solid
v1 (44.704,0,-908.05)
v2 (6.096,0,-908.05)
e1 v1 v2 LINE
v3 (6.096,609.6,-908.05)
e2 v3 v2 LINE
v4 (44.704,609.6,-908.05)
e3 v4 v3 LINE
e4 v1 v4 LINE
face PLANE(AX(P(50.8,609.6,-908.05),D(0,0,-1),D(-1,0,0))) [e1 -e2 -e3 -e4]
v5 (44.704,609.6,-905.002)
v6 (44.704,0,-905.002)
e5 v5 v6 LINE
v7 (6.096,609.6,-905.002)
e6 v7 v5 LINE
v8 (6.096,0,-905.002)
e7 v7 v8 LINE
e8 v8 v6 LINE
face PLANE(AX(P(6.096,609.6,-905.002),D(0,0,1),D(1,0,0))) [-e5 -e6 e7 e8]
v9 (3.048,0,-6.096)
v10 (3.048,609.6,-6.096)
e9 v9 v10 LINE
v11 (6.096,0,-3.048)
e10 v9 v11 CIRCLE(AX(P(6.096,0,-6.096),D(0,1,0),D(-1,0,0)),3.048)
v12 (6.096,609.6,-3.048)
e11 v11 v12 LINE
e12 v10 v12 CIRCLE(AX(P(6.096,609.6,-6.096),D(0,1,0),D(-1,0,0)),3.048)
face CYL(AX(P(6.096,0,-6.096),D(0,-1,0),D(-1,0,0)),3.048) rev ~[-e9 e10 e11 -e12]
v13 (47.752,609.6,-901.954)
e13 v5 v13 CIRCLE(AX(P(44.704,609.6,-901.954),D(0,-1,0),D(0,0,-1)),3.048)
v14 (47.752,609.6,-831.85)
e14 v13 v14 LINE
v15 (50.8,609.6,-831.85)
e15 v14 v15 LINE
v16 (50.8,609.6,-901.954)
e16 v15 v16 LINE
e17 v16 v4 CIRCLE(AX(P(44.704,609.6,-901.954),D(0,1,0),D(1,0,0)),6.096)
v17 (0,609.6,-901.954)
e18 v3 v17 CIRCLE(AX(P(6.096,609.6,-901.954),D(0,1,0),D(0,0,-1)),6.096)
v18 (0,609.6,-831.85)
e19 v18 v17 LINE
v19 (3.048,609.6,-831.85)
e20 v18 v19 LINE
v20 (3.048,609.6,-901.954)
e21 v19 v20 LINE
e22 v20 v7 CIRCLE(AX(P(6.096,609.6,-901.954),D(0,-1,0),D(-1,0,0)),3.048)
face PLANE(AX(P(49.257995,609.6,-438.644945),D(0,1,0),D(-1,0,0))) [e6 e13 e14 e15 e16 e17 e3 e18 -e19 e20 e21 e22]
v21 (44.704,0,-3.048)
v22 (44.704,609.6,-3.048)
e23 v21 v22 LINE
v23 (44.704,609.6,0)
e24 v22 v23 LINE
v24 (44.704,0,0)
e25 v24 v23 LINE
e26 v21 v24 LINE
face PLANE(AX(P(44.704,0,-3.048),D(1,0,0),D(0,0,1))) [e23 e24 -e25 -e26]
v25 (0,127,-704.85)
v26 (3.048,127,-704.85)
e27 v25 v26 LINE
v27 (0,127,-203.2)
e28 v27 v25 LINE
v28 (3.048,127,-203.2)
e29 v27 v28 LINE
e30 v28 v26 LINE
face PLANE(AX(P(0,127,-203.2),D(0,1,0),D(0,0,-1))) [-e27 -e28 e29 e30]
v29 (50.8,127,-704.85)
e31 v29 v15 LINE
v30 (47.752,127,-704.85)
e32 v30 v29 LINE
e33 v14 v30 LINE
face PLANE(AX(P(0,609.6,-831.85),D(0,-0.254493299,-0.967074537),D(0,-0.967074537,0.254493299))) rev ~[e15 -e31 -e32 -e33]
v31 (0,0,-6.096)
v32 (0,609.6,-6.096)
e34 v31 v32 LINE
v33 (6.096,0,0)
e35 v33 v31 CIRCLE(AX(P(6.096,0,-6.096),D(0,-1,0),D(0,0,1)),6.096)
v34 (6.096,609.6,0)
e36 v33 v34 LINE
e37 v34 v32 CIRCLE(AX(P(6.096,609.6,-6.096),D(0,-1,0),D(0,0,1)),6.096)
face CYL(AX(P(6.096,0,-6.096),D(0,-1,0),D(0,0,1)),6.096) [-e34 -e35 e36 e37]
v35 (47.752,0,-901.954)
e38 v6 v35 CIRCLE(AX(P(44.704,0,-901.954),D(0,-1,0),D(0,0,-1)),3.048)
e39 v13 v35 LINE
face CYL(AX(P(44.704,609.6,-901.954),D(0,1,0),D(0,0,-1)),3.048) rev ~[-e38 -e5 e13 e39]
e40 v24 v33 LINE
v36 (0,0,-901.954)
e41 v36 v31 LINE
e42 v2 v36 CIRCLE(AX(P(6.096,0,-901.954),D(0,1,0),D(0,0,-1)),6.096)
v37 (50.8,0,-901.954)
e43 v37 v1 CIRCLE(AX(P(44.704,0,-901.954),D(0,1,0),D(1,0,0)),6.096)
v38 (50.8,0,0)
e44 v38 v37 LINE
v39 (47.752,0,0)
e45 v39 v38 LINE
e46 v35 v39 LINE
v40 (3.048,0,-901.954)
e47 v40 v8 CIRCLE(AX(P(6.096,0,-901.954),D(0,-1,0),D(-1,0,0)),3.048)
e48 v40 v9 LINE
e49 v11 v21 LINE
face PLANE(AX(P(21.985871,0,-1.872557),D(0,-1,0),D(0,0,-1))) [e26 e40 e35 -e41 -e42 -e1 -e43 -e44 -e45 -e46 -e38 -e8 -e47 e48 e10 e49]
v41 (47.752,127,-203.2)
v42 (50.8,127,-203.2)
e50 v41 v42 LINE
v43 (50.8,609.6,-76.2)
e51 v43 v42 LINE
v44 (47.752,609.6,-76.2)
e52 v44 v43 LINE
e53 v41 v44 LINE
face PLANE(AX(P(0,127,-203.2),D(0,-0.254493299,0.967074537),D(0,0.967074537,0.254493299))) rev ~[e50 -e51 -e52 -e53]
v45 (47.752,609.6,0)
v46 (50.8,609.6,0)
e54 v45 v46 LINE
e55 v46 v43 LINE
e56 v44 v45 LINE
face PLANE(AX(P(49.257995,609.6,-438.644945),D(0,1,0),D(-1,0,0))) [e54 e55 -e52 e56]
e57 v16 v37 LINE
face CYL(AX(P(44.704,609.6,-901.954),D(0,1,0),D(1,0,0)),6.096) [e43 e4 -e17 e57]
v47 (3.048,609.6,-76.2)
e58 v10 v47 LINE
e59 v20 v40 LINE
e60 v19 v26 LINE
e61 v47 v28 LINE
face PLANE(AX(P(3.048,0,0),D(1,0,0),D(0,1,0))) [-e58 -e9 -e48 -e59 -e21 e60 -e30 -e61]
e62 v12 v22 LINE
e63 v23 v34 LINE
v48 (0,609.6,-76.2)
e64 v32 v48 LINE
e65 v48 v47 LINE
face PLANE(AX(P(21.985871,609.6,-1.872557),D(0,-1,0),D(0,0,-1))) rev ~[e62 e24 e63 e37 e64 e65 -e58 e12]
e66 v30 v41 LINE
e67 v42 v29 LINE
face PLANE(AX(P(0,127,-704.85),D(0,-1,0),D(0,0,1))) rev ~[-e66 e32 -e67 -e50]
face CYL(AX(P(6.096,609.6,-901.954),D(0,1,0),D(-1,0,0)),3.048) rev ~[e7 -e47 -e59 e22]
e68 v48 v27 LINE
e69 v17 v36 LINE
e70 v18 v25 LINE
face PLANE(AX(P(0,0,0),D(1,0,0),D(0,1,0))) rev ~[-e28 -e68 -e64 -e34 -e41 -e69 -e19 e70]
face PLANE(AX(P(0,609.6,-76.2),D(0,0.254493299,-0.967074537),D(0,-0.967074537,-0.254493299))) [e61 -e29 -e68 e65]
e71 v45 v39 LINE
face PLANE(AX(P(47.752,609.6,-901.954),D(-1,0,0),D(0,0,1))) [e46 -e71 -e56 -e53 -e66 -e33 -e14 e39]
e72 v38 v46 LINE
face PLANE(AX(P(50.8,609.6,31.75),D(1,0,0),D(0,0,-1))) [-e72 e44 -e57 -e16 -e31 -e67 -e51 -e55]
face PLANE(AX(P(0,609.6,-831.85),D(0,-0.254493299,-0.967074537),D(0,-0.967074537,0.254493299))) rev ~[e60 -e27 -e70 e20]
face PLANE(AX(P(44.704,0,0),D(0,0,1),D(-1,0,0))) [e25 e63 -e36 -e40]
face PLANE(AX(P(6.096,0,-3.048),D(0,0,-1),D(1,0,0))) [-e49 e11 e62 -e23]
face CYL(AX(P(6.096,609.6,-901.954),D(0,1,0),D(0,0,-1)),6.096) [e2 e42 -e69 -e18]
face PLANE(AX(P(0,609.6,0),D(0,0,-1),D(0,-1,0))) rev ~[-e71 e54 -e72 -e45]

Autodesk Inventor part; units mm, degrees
ref_plane "YZ Plane" through (0, 0, 0) normal (1, 0, 0) x (0, 1, 0)
ref_plane "XZ Plane" through (0, 0, 0) normal (0, 1, 0) x (-1, 0, 0)
ref_plane "XY Plane" through (0, 0, 0) normal (0, 0, 1) x (1, 0, 0)
sketch "Sketch1" plane through (0, 0, 0) normal (1, 0, 0) x (0, 1, 0)
  line L0 (0, 0) -> (609.6, 0)
  line L1 (609.6, 0) -> (609.6, -908.05)
  line L2 (609.6, -908.05) -> (0, -908.05)
  line L3 (0, -908.05) -> (0, 0)
  line L4 (127, 0) -> (127, -908.05)
  line L5 (609.6, 0) -> (127, -127)
  line L6 (609.6, -908.05) -> (127, -781.05)
  line L7 (609.6, -76.2) -> (127, -203.2)
  line L8 (609.6, -831.85) -> (127, -704.85)
  dimension "d0" = 609.6
  dimension "d1" = 908.05
  dimension "d2" = 127
  dimension "d3" = 127
  dimension "d4" = 127
  dimension "d6" = 76.2
  dimension "d7" = 76.2
extrude "Plate1" add sketch "Sketch1" along normal blind 3.048 contours L0 L4 L2 L3 | L0 L5 L4 | L1 L7 L4 L5 | L4 L6 L2 | L6 L4 L8 L1
sketch "Sketch2" plane through (0, 609.6, -905.002) normal (0, 0, -1) x (-1, 0, 0)
  line L0 (0, -609.6) -> (0, 0)
  line L1 (0, 0) -> (-50.8, 0)
  line L2 (-50.8, 0) -> (-50.8, -609.6)
  line L3 (-50.8, -609.6) -> (0, -609.6)
edge flange "Flange1" height 50.8 angle 90 thickness 3.048 bend radius 3.048 thickness toward (0, 0, -1) relief tear relief width 3.048 relief depth 1.524 edges at (3.048, 304.8, -908.05) wall of the first edge with corners at (0, 0, -905.002) (0, 609.6, -905.002) (50.8, 609.6, -905.002) (50.8, 0, -905.002)
bend "Bend1"
corner "Corner1"
sketch "Sketch3" plane through (47.752, 609.6, -908.05) normal (1, 0, 0) x (0, 1, 0)
  line L0 (-609.6, 0) -> (0, 0)
  line L1 (0, 0) -> (0, 939.8)
  line L2 (0, 939.8) -> (-609.6, 939.8)
  line L3 (-609.6, 939.8) -> (-609.6, 0)
edge flange "Flange2" height 939.8 angle 90 thickness 3.048 bend radius 3.048 thickness toward (1, 0, 0) relief tear relief width 3.048 relief depth 1.524 edges at (50.8, 304.8, -905.002) wall of the first edge with corners at (47.752, 0, -908.05) (47.752, 609.6, -908.05) (47.752, 609.6, 31.75) (47.752, 0, 31.75)
bend "Bend2"
corner "Corner2"
sketch "Sketch4" plane through (0, 0, 0) normal (-1, 0, 0) x (0, 0, 1)
  line L0 (-901.954, 609.6) -> (-901.954, 0) projected
  line L1 (0, 0) -> (-901.954, 0) projected
  line L2 (0, 609.6) -> (0, 0) projected
  line L3 (-76.2, 609.6) -> (0, 609.6) projected
  line L4 (-203.2, 127) -> (-76.2, 609.6) projected
  line L5 (-704.85, 127) -> (-203.2, 127) projected
  line L6 (-831.85, 609.6) -> (-704.85, 127) projected
  line L7 (-901.954, 609.6) -> (-831.85, 609.6) projected
  line L8 (-908.05, 0) -> (-908.05, 609.6) projected
  line L9 (-901.954, 609.6) -> (-908.05, 609.6) projected
  line L10 (-908.05, 0) -> (-901.954, 0) projected
  line L11 (-908.05, 0) -> (-908.05, 609.6) projected
  line L12 (-901.954, 0) -> (-908.05, 0) projected
  line L13 (-901.954, 609.6) -> (-901.954, 0) projected
  line L14 (-908.05, 609.6) -> (-901.954, 609.6) projected
extrude "Extrusion1" cut sketch "Sketch4" against normal blind 76.2 keep common part
sketch "Sketch5" plane through (0, 0, -3.048) normal (0, 0, 1) x (1, 0, 0)
  line L0 (0, 609.6) -> (0, 0)
  line L1 (0, 0) -> (44.704, 0)
  line L2 (44.704, 0) -> (44.704, 609.6)
  line L3 (44.704, 609.6) -> (0, 609.6)
edge flange "Flange3" height 44.704 angle 90 thickness 3.048 bend radius 3.048 thickness toward (0, 0, 1) relief tear relief width 3.048 relief depth 1.524 edges at (3.048, 304.8, 0) wall of the first edge with corners at (0, 609.6, -3.048) (0, 0, -3.048) (44.704, 0, -3.048) (44.704, 609.6, -3.048)
bend "Bend3"
corner "Corner3"
equation "\"d8\" = Thickness"
equation "\"d9\" = BendReliefWidth"
equation "\"d10\" = BendReliefDepth"
equation "\"d11\" = MinimumRemnant"
equation "\"d12\" = TransitionRadius"
equation "\"d15\" = BendRadius"
equation "\"d16\" = CornerReliefSize"
equation "\"d17\" = GapSize"
equation "\"d18\" = JacobiRadiusSize"
equation "\"d19\" = BendReliefWidth"
equation "\"d20\" = BendReliefDepth"
equation "\"d21\" = MinimumRemnant"
equation "\"d22\" = TransitionRadius"
equation "\"d25\" = BendRadius"
equation "\"d26\" = CornerReliefSize"
equation "\"d27\" = GapSize"
equation "\"d28\" = JacobiRadiusSize"
equation "\"d31\" = BendReliefWidth"
equation "\"d32\" = BendReliefDepth"
equation "\"d33\" = MinimumRemnant"
equation "\"d34\" = TransitionRadius"
equation "\"d37\" = BendRadius"
equation "\"d38\" = CornerReliefSize"
equation "\"d39\" = GapSize"
equation "\"d40\" = JacobiRadiusSize"
equation "\"BendRadius\" = Thickness"
equation "\"BendReliefWidth\" = Thickness"
equation "\"BendReliefDepth\" = 0.5 * Thickness"
equation "\"CornerReliefSize\" = 4 * Thickness"
equation "\"MinimumRemnant\" = 2 * Thickness"
equation "\"TransitionRadius\" = BendRadius"
equation "\"JacobiRadiusSize\" = BendRadius"
equation "\"GapSize\" = Thickness"
equation "\"Thickness\" = 3.048"
properties part number "Div_Big"
